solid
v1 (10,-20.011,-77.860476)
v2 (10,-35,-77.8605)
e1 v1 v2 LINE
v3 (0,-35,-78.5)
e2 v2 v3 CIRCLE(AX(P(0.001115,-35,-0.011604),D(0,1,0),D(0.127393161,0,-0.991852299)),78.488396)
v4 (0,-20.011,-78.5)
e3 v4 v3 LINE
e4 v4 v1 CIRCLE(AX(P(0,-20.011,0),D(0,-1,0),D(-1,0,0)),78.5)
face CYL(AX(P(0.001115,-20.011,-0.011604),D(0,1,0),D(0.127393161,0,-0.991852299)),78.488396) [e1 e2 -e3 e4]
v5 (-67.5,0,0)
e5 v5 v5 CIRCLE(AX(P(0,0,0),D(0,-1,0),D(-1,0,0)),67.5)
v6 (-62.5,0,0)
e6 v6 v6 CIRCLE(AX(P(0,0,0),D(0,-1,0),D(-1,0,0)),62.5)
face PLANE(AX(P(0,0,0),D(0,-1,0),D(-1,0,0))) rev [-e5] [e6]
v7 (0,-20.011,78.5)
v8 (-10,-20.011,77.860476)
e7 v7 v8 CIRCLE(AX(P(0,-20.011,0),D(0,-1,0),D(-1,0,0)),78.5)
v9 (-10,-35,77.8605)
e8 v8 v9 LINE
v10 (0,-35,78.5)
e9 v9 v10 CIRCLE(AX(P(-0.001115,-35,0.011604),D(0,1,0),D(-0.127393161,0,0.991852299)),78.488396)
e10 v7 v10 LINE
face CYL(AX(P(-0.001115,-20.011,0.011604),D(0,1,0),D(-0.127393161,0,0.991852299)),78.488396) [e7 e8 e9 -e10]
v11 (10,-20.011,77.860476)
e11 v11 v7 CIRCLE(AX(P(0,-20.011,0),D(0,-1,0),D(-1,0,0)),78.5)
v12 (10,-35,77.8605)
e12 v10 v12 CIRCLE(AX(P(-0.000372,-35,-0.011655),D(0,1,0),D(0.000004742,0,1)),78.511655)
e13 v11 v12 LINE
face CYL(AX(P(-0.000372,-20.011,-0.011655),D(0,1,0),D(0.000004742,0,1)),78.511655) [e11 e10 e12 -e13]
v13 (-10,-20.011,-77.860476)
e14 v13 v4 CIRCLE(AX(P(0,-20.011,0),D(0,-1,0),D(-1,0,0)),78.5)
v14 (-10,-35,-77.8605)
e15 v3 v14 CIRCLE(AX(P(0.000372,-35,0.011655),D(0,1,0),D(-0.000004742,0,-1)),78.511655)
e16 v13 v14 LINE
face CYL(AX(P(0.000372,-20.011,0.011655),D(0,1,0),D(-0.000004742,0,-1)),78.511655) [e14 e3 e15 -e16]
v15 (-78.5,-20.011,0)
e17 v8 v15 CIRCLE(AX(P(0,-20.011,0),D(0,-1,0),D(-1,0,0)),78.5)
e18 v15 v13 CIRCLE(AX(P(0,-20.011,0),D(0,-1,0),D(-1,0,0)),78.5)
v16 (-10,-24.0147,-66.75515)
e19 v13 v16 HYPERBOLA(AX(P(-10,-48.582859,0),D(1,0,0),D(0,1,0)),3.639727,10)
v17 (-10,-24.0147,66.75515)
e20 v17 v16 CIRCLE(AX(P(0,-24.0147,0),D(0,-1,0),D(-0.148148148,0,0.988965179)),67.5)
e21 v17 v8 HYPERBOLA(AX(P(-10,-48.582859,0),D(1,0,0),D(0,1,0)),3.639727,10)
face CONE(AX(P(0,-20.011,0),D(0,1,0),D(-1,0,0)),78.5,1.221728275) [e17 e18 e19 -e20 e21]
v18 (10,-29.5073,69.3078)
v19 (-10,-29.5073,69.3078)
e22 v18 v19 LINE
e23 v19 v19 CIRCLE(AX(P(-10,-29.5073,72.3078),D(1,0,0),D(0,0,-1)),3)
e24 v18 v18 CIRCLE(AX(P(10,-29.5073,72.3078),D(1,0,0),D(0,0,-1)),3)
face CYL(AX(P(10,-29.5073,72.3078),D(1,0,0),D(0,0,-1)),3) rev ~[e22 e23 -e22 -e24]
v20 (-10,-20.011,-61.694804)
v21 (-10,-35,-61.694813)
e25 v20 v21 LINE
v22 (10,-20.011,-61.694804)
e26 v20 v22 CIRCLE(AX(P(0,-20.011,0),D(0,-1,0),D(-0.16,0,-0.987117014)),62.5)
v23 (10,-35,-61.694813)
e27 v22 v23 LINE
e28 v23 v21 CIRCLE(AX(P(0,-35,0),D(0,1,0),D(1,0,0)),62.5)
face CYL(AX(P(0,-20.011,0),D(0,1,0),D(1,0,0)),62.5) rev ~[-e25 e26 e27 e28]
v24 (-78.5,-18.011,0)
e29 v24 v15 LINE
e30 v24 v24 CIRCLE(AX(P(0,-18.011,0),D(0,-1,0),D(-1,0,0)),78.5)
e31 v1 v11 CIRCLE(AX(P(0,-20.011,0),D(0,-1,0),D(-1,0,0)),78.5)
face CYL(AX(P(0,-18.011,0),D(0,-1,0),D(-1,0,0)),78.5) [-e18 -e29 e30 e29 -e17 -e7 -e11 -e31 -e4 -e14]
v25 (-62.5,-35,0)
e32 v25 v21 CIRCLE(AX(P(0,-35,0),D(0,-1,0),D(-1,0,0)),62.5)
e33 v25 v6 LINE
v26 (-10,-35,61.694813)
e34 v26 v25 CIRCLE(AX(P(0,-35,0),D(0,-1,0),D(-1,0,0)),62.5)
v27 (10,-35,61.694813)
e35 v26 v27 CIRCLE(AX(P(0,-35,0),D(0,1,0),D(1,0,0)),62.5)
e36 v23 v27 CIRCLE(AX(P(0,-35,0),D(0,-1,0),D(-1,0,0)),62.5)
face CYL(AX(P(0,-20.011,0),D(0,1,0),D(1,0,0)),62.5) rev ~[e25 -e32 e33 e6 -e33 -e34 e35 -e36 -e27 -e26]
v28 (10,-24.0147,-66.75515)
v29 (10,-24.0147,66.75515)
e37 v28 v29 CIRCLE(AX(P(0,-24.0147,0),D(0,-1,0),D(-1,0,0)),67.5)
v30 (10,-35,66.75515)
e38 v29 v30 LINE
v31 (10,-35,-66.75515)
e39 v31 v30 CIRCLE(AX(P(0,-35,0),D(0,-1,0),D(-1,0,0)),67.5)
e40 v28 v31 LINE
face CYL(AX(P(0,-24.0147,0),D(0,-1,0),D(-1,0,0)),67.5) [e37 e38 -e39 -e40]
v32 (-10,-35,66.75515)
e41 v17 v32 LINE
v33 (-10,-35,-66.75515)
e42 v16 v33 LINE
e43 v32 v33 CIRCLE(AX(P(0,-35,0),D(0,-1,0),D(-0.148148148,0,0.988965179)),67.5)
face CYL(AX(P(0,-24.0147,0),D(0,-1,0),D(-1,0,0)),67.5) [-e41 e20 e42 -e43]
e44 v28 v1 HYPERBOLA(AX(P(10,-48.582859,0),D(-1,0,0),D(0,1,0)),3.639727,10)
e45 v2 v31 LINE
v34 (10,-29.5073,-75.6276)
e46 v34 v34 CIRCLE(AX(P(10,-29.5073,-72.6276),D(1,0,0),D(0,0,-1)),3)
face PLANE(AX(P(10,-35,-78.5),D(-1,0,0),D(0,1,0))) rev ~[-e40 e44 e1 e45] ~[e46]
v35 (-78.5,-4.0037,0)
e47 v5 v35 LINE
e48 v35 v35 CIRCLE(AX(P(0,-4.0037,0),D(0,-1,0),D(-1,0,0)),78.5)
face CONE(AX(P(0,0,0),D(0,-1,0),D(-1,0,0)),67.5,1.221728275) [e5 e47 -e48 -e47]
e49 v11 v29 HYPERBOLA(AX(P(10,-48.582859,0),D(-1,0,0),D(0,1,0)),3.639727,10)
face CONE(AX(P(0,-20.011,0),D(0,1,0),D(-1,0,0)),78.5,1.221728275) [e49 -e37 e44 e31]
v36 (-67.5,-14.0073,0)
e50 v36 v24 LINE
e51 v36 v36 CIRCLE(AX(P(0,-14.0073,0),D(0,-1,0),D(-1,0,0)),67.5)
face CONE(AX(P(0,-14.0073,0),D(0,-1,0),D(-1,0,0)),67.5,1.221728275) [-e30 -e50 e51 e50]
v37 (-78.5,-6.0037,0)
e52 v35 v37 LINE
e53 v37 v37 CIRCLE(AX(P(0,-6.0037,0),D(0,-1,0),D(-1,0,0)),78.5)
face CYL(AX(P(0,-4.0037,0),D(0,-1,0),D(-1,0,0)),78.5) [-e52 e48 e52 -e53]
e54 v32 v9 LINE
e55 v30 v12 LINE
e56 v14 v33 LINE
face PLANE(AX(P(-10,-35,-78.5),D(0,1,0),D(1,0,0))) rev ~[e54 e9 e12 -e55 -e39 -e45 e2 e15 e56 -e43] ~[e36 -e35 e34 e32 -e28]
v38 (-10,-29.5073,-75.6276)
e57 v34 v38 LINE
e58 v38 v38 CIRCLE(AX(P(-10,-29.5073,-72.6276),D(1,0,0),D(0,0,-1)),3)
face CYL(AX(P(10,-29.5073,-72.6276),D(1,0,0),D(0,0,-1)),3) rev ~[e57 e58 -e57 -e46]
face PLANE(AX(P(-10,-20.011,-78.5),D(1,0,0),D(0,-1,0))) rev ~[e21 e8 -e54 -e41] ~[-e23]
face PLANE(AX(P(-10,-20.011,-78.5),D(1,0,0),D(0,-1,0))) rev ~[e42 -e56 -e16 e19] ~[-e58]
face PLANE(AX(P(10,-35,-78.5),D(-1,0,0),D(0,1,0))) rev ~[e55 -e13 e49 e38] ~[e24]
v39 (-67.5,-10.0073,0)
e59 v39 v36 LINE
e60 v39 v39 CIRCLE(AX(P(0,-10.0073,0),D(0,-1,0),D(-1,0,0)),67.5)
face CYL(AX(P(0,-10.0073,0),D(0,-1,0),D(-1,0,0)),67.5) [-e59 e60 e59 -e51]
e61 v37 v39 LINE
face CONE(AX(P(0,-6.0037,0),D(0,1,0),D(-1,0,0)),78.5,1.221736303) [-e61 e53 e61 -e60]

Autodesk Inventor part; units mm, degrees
ref_plane "YZ Plane" through (0, 0, 0) normal (1, 0, 0) x (0, 1, 0)
sketch "Sketch1" plane through (0, 0, 0) normal (0, 0, 1) x (1, 0, 0)
  line L0 (0, 0) -> (-171.0711, 0) construction
  line L1 (0, 0) -> (0, -629.6601) construction
  line L2 (-62.5, 0) -> (-62.5, -35)
  line L3 (-62.5, -35) -> (-67.5, -35)
  line L4 (-62.5, 0) -> (-67.5, 0)
  line L5 (-67.5, 0) -> (-78.5, -4.0037)
  line L6 (-78.5, -4.0037) -> (-78.5, -6.0037)
  line L7 (-78.5, -6.0037) -> (-67.5, -10.0073)
  line L8 (-67.5, -10.0073) -> (-67.5, -14.0073)
  line L9 (-67.5, -14.0073) -> (-78.5, -18.011)
  line L10 (-78.5, -18.011) -> (-78.5, -20.011)
  line L11 (-67.5, -35) -> (-67.5, 0) construction
  line L12 (-78.5, -20.011) -> (-67.5, -24.0147)
  line L13 (-78.5, -20.011) -> (-66.794, -20.011) construction
  line L14 (-67.5, -24.0147) -> (-67.5, -35)
  line L15 (-62.5, -33.4145) -> (-62.8994, -35)
  dimension "d1" = 35
  dimension "d2" = 5
  dimension "d3" = 5
  dimension "d6" = 2
  dimension "d8" = 2
  dimension "d10" = 40
  dimension "d11" = 62.5
  dimension "d12" = 20
  dimension "d13" = 4
  dimension "d14" = 11
  dimension "d15" = 5
revolve "Revolution1" add sketch "Sketch1" angle 360 about axis through (0, 0, 0) along (0, -1, 0)
sketch "Sketch2" plane through (0, 0, 0) normal (0, 0, 1) x (1, 0, 0)
  point P0 (0, 0)
sketch "Sketch3" plane through (0, 0, 0) normal (1, 0, 0) x (0, 1, 0)
  line L0 (-6.0037, -78.5) -> (-4.0037, -78.5) projected
  line L1 (-20.011, -78.5) -> (-18.011, -78.5) projected
  line L2 (-4.0037, -78.5) -> (-20.011, -78.5)
  line L3 (-6.0037, -78.5) -> (-6.0037, 78.5) projected
  line L4 (-6.0037, 78.5) -> (-4.0037, 78.5) projected
  line L5 (-20.011, 78.5) -> (-18.011, 78.5) projected
  line L6 (-20.011, -78.5) -> (-20.011, 78.5) projected
  line L7 (-20.011, 78.5) -> (-4.0037, 78.5)
  point P0 (0, 0)
ref_plane "Work Plane1" through (0, -4.0037, -78.5) normal (0, 0, -1) x (-1, 0, 0)
sketch "Sketch4" plane through (0, -4.0037, -78.5) normal (0, 0, -1) x (-1, 0, 0)
  line L0 (67.5, -30.9963) -> (-67.5, -30.9963) projected
  line L1 (10, -30.9963) -> (-10, -30.9963)
  line L2 (-10, -30.9963) -> (-10, -16.0073)
  line L3 (-10, -16.0073) -> (10, -16.0073)
  line L4 (10, -16.0073) -> (10, -30.9963)
  line L5 (0, 0) -> (0, -16.0073) projected
  point P0 (0, 4.0037)
  dimension "d17" = 20
  dimension "d18" = 10
ref_plane "Work Plane2" through (0, -20.011, 78.5) normal (0, 0, 1) x (1, 0, 0)
extrude "Extrusion1" add sketch "Sketch4" against normal up to surface (157 mm away)
sketch "Sketch5" plane through (0, -20.011, 0) normal (0, 1, 0) x (1, 0, 0)
  circle A0 centre (0, 0) radius 62.5 projected
  arc A1 (-10, -61.6948) -> (10, -61.6948) centre (0, 0) ccw projected
  line L0 (10, 61.6948) -> (10, -61.6948) projected
  arc A2 (10, 61.6948) -> (-10, 61.6948) centre (0, 0) ccw projected
  line L1 (-10, 61.6948) -> (-10, -61.6948) projected
  arc A3 (-10, -77.8605) -> (0, -78.5) centre (0, 0) ccw projected
  line L2 (-10, -77.8605) -> (-10, -78.5) projected
  line L3 (-10, -78.5) -> (0, -78.5) projected
  arc A4 (0, -78.5) -> (10, -77.8605) centre (0, 0) ccw projected
  line L4 (0, -78.5) -> (10, -78.5) projected
  line L5 (10, -77.8605) -> (10, -78.5) projected
  arc A5 (0, 78.5) -> (-10, 77.8605) centre (0, 0) ccw projected
  line L6 (-10, 78.5) -> (0, 78.5) projected
  line L7 (-10, 78.5) -> (-10, 77.8605) projected
  arc A6 (10, 77.8605) -> (0, 78.5) centre (0, 0) ccw projected
  line L8 (10, 78.5) -> (10, 77.8605) projected
  line L9 (0, 78.5) -> (10, 78.5) projected
  point P0 (0, -78.5)
  point P1 (0, -78.5)
  point P2 (0, -78.5)
  point P3 (0, -78.5)
  point P4 (-10, 61.6948)
  point P5 (-10, -61.6948)
  point P6 (10, -61.6948)
extrude "Extrusion2" cut sketch "Sketch5" against normal through all contours L0 A0 L1 | A4 L5 L4 | A3 L3 L2 | A5 L7 L6 | L9 L8 A6
sketch "Sketch6" plane through (10, -35, -77.8605) normal (1, 0, 0) x (0, 0, -1)
  line L0 (0, 0) -> (0.6395, 0) construction
  line L1 (-11.1053, 10.9853) -> (-11.1053, 0) construction
  line L2 (0.6395, 0) -> (-11.1053, 10.9853) construction
  circle A0 centre (-5.2329, 5.4927) radius 3
  line L3 (-144.6156, 10.9853) -> (-144.6156, 0) construction
  line L4 (-155.7209, 14.989) -> (-155.7209, 0) construction
  line L5 (-144.6156, 10.9853) -> (-155.7209, 0) construction
  circle A1 centre (-150.1683, 5.4927) radius 3
  point P0 (-77.8605, 35)
  dimension "d23" = 6
  dimension "d24" = 6
extrude "Extrusion3" cut sketch "Sketch6" against normal through all
properties part number "adapter_za_motor"
